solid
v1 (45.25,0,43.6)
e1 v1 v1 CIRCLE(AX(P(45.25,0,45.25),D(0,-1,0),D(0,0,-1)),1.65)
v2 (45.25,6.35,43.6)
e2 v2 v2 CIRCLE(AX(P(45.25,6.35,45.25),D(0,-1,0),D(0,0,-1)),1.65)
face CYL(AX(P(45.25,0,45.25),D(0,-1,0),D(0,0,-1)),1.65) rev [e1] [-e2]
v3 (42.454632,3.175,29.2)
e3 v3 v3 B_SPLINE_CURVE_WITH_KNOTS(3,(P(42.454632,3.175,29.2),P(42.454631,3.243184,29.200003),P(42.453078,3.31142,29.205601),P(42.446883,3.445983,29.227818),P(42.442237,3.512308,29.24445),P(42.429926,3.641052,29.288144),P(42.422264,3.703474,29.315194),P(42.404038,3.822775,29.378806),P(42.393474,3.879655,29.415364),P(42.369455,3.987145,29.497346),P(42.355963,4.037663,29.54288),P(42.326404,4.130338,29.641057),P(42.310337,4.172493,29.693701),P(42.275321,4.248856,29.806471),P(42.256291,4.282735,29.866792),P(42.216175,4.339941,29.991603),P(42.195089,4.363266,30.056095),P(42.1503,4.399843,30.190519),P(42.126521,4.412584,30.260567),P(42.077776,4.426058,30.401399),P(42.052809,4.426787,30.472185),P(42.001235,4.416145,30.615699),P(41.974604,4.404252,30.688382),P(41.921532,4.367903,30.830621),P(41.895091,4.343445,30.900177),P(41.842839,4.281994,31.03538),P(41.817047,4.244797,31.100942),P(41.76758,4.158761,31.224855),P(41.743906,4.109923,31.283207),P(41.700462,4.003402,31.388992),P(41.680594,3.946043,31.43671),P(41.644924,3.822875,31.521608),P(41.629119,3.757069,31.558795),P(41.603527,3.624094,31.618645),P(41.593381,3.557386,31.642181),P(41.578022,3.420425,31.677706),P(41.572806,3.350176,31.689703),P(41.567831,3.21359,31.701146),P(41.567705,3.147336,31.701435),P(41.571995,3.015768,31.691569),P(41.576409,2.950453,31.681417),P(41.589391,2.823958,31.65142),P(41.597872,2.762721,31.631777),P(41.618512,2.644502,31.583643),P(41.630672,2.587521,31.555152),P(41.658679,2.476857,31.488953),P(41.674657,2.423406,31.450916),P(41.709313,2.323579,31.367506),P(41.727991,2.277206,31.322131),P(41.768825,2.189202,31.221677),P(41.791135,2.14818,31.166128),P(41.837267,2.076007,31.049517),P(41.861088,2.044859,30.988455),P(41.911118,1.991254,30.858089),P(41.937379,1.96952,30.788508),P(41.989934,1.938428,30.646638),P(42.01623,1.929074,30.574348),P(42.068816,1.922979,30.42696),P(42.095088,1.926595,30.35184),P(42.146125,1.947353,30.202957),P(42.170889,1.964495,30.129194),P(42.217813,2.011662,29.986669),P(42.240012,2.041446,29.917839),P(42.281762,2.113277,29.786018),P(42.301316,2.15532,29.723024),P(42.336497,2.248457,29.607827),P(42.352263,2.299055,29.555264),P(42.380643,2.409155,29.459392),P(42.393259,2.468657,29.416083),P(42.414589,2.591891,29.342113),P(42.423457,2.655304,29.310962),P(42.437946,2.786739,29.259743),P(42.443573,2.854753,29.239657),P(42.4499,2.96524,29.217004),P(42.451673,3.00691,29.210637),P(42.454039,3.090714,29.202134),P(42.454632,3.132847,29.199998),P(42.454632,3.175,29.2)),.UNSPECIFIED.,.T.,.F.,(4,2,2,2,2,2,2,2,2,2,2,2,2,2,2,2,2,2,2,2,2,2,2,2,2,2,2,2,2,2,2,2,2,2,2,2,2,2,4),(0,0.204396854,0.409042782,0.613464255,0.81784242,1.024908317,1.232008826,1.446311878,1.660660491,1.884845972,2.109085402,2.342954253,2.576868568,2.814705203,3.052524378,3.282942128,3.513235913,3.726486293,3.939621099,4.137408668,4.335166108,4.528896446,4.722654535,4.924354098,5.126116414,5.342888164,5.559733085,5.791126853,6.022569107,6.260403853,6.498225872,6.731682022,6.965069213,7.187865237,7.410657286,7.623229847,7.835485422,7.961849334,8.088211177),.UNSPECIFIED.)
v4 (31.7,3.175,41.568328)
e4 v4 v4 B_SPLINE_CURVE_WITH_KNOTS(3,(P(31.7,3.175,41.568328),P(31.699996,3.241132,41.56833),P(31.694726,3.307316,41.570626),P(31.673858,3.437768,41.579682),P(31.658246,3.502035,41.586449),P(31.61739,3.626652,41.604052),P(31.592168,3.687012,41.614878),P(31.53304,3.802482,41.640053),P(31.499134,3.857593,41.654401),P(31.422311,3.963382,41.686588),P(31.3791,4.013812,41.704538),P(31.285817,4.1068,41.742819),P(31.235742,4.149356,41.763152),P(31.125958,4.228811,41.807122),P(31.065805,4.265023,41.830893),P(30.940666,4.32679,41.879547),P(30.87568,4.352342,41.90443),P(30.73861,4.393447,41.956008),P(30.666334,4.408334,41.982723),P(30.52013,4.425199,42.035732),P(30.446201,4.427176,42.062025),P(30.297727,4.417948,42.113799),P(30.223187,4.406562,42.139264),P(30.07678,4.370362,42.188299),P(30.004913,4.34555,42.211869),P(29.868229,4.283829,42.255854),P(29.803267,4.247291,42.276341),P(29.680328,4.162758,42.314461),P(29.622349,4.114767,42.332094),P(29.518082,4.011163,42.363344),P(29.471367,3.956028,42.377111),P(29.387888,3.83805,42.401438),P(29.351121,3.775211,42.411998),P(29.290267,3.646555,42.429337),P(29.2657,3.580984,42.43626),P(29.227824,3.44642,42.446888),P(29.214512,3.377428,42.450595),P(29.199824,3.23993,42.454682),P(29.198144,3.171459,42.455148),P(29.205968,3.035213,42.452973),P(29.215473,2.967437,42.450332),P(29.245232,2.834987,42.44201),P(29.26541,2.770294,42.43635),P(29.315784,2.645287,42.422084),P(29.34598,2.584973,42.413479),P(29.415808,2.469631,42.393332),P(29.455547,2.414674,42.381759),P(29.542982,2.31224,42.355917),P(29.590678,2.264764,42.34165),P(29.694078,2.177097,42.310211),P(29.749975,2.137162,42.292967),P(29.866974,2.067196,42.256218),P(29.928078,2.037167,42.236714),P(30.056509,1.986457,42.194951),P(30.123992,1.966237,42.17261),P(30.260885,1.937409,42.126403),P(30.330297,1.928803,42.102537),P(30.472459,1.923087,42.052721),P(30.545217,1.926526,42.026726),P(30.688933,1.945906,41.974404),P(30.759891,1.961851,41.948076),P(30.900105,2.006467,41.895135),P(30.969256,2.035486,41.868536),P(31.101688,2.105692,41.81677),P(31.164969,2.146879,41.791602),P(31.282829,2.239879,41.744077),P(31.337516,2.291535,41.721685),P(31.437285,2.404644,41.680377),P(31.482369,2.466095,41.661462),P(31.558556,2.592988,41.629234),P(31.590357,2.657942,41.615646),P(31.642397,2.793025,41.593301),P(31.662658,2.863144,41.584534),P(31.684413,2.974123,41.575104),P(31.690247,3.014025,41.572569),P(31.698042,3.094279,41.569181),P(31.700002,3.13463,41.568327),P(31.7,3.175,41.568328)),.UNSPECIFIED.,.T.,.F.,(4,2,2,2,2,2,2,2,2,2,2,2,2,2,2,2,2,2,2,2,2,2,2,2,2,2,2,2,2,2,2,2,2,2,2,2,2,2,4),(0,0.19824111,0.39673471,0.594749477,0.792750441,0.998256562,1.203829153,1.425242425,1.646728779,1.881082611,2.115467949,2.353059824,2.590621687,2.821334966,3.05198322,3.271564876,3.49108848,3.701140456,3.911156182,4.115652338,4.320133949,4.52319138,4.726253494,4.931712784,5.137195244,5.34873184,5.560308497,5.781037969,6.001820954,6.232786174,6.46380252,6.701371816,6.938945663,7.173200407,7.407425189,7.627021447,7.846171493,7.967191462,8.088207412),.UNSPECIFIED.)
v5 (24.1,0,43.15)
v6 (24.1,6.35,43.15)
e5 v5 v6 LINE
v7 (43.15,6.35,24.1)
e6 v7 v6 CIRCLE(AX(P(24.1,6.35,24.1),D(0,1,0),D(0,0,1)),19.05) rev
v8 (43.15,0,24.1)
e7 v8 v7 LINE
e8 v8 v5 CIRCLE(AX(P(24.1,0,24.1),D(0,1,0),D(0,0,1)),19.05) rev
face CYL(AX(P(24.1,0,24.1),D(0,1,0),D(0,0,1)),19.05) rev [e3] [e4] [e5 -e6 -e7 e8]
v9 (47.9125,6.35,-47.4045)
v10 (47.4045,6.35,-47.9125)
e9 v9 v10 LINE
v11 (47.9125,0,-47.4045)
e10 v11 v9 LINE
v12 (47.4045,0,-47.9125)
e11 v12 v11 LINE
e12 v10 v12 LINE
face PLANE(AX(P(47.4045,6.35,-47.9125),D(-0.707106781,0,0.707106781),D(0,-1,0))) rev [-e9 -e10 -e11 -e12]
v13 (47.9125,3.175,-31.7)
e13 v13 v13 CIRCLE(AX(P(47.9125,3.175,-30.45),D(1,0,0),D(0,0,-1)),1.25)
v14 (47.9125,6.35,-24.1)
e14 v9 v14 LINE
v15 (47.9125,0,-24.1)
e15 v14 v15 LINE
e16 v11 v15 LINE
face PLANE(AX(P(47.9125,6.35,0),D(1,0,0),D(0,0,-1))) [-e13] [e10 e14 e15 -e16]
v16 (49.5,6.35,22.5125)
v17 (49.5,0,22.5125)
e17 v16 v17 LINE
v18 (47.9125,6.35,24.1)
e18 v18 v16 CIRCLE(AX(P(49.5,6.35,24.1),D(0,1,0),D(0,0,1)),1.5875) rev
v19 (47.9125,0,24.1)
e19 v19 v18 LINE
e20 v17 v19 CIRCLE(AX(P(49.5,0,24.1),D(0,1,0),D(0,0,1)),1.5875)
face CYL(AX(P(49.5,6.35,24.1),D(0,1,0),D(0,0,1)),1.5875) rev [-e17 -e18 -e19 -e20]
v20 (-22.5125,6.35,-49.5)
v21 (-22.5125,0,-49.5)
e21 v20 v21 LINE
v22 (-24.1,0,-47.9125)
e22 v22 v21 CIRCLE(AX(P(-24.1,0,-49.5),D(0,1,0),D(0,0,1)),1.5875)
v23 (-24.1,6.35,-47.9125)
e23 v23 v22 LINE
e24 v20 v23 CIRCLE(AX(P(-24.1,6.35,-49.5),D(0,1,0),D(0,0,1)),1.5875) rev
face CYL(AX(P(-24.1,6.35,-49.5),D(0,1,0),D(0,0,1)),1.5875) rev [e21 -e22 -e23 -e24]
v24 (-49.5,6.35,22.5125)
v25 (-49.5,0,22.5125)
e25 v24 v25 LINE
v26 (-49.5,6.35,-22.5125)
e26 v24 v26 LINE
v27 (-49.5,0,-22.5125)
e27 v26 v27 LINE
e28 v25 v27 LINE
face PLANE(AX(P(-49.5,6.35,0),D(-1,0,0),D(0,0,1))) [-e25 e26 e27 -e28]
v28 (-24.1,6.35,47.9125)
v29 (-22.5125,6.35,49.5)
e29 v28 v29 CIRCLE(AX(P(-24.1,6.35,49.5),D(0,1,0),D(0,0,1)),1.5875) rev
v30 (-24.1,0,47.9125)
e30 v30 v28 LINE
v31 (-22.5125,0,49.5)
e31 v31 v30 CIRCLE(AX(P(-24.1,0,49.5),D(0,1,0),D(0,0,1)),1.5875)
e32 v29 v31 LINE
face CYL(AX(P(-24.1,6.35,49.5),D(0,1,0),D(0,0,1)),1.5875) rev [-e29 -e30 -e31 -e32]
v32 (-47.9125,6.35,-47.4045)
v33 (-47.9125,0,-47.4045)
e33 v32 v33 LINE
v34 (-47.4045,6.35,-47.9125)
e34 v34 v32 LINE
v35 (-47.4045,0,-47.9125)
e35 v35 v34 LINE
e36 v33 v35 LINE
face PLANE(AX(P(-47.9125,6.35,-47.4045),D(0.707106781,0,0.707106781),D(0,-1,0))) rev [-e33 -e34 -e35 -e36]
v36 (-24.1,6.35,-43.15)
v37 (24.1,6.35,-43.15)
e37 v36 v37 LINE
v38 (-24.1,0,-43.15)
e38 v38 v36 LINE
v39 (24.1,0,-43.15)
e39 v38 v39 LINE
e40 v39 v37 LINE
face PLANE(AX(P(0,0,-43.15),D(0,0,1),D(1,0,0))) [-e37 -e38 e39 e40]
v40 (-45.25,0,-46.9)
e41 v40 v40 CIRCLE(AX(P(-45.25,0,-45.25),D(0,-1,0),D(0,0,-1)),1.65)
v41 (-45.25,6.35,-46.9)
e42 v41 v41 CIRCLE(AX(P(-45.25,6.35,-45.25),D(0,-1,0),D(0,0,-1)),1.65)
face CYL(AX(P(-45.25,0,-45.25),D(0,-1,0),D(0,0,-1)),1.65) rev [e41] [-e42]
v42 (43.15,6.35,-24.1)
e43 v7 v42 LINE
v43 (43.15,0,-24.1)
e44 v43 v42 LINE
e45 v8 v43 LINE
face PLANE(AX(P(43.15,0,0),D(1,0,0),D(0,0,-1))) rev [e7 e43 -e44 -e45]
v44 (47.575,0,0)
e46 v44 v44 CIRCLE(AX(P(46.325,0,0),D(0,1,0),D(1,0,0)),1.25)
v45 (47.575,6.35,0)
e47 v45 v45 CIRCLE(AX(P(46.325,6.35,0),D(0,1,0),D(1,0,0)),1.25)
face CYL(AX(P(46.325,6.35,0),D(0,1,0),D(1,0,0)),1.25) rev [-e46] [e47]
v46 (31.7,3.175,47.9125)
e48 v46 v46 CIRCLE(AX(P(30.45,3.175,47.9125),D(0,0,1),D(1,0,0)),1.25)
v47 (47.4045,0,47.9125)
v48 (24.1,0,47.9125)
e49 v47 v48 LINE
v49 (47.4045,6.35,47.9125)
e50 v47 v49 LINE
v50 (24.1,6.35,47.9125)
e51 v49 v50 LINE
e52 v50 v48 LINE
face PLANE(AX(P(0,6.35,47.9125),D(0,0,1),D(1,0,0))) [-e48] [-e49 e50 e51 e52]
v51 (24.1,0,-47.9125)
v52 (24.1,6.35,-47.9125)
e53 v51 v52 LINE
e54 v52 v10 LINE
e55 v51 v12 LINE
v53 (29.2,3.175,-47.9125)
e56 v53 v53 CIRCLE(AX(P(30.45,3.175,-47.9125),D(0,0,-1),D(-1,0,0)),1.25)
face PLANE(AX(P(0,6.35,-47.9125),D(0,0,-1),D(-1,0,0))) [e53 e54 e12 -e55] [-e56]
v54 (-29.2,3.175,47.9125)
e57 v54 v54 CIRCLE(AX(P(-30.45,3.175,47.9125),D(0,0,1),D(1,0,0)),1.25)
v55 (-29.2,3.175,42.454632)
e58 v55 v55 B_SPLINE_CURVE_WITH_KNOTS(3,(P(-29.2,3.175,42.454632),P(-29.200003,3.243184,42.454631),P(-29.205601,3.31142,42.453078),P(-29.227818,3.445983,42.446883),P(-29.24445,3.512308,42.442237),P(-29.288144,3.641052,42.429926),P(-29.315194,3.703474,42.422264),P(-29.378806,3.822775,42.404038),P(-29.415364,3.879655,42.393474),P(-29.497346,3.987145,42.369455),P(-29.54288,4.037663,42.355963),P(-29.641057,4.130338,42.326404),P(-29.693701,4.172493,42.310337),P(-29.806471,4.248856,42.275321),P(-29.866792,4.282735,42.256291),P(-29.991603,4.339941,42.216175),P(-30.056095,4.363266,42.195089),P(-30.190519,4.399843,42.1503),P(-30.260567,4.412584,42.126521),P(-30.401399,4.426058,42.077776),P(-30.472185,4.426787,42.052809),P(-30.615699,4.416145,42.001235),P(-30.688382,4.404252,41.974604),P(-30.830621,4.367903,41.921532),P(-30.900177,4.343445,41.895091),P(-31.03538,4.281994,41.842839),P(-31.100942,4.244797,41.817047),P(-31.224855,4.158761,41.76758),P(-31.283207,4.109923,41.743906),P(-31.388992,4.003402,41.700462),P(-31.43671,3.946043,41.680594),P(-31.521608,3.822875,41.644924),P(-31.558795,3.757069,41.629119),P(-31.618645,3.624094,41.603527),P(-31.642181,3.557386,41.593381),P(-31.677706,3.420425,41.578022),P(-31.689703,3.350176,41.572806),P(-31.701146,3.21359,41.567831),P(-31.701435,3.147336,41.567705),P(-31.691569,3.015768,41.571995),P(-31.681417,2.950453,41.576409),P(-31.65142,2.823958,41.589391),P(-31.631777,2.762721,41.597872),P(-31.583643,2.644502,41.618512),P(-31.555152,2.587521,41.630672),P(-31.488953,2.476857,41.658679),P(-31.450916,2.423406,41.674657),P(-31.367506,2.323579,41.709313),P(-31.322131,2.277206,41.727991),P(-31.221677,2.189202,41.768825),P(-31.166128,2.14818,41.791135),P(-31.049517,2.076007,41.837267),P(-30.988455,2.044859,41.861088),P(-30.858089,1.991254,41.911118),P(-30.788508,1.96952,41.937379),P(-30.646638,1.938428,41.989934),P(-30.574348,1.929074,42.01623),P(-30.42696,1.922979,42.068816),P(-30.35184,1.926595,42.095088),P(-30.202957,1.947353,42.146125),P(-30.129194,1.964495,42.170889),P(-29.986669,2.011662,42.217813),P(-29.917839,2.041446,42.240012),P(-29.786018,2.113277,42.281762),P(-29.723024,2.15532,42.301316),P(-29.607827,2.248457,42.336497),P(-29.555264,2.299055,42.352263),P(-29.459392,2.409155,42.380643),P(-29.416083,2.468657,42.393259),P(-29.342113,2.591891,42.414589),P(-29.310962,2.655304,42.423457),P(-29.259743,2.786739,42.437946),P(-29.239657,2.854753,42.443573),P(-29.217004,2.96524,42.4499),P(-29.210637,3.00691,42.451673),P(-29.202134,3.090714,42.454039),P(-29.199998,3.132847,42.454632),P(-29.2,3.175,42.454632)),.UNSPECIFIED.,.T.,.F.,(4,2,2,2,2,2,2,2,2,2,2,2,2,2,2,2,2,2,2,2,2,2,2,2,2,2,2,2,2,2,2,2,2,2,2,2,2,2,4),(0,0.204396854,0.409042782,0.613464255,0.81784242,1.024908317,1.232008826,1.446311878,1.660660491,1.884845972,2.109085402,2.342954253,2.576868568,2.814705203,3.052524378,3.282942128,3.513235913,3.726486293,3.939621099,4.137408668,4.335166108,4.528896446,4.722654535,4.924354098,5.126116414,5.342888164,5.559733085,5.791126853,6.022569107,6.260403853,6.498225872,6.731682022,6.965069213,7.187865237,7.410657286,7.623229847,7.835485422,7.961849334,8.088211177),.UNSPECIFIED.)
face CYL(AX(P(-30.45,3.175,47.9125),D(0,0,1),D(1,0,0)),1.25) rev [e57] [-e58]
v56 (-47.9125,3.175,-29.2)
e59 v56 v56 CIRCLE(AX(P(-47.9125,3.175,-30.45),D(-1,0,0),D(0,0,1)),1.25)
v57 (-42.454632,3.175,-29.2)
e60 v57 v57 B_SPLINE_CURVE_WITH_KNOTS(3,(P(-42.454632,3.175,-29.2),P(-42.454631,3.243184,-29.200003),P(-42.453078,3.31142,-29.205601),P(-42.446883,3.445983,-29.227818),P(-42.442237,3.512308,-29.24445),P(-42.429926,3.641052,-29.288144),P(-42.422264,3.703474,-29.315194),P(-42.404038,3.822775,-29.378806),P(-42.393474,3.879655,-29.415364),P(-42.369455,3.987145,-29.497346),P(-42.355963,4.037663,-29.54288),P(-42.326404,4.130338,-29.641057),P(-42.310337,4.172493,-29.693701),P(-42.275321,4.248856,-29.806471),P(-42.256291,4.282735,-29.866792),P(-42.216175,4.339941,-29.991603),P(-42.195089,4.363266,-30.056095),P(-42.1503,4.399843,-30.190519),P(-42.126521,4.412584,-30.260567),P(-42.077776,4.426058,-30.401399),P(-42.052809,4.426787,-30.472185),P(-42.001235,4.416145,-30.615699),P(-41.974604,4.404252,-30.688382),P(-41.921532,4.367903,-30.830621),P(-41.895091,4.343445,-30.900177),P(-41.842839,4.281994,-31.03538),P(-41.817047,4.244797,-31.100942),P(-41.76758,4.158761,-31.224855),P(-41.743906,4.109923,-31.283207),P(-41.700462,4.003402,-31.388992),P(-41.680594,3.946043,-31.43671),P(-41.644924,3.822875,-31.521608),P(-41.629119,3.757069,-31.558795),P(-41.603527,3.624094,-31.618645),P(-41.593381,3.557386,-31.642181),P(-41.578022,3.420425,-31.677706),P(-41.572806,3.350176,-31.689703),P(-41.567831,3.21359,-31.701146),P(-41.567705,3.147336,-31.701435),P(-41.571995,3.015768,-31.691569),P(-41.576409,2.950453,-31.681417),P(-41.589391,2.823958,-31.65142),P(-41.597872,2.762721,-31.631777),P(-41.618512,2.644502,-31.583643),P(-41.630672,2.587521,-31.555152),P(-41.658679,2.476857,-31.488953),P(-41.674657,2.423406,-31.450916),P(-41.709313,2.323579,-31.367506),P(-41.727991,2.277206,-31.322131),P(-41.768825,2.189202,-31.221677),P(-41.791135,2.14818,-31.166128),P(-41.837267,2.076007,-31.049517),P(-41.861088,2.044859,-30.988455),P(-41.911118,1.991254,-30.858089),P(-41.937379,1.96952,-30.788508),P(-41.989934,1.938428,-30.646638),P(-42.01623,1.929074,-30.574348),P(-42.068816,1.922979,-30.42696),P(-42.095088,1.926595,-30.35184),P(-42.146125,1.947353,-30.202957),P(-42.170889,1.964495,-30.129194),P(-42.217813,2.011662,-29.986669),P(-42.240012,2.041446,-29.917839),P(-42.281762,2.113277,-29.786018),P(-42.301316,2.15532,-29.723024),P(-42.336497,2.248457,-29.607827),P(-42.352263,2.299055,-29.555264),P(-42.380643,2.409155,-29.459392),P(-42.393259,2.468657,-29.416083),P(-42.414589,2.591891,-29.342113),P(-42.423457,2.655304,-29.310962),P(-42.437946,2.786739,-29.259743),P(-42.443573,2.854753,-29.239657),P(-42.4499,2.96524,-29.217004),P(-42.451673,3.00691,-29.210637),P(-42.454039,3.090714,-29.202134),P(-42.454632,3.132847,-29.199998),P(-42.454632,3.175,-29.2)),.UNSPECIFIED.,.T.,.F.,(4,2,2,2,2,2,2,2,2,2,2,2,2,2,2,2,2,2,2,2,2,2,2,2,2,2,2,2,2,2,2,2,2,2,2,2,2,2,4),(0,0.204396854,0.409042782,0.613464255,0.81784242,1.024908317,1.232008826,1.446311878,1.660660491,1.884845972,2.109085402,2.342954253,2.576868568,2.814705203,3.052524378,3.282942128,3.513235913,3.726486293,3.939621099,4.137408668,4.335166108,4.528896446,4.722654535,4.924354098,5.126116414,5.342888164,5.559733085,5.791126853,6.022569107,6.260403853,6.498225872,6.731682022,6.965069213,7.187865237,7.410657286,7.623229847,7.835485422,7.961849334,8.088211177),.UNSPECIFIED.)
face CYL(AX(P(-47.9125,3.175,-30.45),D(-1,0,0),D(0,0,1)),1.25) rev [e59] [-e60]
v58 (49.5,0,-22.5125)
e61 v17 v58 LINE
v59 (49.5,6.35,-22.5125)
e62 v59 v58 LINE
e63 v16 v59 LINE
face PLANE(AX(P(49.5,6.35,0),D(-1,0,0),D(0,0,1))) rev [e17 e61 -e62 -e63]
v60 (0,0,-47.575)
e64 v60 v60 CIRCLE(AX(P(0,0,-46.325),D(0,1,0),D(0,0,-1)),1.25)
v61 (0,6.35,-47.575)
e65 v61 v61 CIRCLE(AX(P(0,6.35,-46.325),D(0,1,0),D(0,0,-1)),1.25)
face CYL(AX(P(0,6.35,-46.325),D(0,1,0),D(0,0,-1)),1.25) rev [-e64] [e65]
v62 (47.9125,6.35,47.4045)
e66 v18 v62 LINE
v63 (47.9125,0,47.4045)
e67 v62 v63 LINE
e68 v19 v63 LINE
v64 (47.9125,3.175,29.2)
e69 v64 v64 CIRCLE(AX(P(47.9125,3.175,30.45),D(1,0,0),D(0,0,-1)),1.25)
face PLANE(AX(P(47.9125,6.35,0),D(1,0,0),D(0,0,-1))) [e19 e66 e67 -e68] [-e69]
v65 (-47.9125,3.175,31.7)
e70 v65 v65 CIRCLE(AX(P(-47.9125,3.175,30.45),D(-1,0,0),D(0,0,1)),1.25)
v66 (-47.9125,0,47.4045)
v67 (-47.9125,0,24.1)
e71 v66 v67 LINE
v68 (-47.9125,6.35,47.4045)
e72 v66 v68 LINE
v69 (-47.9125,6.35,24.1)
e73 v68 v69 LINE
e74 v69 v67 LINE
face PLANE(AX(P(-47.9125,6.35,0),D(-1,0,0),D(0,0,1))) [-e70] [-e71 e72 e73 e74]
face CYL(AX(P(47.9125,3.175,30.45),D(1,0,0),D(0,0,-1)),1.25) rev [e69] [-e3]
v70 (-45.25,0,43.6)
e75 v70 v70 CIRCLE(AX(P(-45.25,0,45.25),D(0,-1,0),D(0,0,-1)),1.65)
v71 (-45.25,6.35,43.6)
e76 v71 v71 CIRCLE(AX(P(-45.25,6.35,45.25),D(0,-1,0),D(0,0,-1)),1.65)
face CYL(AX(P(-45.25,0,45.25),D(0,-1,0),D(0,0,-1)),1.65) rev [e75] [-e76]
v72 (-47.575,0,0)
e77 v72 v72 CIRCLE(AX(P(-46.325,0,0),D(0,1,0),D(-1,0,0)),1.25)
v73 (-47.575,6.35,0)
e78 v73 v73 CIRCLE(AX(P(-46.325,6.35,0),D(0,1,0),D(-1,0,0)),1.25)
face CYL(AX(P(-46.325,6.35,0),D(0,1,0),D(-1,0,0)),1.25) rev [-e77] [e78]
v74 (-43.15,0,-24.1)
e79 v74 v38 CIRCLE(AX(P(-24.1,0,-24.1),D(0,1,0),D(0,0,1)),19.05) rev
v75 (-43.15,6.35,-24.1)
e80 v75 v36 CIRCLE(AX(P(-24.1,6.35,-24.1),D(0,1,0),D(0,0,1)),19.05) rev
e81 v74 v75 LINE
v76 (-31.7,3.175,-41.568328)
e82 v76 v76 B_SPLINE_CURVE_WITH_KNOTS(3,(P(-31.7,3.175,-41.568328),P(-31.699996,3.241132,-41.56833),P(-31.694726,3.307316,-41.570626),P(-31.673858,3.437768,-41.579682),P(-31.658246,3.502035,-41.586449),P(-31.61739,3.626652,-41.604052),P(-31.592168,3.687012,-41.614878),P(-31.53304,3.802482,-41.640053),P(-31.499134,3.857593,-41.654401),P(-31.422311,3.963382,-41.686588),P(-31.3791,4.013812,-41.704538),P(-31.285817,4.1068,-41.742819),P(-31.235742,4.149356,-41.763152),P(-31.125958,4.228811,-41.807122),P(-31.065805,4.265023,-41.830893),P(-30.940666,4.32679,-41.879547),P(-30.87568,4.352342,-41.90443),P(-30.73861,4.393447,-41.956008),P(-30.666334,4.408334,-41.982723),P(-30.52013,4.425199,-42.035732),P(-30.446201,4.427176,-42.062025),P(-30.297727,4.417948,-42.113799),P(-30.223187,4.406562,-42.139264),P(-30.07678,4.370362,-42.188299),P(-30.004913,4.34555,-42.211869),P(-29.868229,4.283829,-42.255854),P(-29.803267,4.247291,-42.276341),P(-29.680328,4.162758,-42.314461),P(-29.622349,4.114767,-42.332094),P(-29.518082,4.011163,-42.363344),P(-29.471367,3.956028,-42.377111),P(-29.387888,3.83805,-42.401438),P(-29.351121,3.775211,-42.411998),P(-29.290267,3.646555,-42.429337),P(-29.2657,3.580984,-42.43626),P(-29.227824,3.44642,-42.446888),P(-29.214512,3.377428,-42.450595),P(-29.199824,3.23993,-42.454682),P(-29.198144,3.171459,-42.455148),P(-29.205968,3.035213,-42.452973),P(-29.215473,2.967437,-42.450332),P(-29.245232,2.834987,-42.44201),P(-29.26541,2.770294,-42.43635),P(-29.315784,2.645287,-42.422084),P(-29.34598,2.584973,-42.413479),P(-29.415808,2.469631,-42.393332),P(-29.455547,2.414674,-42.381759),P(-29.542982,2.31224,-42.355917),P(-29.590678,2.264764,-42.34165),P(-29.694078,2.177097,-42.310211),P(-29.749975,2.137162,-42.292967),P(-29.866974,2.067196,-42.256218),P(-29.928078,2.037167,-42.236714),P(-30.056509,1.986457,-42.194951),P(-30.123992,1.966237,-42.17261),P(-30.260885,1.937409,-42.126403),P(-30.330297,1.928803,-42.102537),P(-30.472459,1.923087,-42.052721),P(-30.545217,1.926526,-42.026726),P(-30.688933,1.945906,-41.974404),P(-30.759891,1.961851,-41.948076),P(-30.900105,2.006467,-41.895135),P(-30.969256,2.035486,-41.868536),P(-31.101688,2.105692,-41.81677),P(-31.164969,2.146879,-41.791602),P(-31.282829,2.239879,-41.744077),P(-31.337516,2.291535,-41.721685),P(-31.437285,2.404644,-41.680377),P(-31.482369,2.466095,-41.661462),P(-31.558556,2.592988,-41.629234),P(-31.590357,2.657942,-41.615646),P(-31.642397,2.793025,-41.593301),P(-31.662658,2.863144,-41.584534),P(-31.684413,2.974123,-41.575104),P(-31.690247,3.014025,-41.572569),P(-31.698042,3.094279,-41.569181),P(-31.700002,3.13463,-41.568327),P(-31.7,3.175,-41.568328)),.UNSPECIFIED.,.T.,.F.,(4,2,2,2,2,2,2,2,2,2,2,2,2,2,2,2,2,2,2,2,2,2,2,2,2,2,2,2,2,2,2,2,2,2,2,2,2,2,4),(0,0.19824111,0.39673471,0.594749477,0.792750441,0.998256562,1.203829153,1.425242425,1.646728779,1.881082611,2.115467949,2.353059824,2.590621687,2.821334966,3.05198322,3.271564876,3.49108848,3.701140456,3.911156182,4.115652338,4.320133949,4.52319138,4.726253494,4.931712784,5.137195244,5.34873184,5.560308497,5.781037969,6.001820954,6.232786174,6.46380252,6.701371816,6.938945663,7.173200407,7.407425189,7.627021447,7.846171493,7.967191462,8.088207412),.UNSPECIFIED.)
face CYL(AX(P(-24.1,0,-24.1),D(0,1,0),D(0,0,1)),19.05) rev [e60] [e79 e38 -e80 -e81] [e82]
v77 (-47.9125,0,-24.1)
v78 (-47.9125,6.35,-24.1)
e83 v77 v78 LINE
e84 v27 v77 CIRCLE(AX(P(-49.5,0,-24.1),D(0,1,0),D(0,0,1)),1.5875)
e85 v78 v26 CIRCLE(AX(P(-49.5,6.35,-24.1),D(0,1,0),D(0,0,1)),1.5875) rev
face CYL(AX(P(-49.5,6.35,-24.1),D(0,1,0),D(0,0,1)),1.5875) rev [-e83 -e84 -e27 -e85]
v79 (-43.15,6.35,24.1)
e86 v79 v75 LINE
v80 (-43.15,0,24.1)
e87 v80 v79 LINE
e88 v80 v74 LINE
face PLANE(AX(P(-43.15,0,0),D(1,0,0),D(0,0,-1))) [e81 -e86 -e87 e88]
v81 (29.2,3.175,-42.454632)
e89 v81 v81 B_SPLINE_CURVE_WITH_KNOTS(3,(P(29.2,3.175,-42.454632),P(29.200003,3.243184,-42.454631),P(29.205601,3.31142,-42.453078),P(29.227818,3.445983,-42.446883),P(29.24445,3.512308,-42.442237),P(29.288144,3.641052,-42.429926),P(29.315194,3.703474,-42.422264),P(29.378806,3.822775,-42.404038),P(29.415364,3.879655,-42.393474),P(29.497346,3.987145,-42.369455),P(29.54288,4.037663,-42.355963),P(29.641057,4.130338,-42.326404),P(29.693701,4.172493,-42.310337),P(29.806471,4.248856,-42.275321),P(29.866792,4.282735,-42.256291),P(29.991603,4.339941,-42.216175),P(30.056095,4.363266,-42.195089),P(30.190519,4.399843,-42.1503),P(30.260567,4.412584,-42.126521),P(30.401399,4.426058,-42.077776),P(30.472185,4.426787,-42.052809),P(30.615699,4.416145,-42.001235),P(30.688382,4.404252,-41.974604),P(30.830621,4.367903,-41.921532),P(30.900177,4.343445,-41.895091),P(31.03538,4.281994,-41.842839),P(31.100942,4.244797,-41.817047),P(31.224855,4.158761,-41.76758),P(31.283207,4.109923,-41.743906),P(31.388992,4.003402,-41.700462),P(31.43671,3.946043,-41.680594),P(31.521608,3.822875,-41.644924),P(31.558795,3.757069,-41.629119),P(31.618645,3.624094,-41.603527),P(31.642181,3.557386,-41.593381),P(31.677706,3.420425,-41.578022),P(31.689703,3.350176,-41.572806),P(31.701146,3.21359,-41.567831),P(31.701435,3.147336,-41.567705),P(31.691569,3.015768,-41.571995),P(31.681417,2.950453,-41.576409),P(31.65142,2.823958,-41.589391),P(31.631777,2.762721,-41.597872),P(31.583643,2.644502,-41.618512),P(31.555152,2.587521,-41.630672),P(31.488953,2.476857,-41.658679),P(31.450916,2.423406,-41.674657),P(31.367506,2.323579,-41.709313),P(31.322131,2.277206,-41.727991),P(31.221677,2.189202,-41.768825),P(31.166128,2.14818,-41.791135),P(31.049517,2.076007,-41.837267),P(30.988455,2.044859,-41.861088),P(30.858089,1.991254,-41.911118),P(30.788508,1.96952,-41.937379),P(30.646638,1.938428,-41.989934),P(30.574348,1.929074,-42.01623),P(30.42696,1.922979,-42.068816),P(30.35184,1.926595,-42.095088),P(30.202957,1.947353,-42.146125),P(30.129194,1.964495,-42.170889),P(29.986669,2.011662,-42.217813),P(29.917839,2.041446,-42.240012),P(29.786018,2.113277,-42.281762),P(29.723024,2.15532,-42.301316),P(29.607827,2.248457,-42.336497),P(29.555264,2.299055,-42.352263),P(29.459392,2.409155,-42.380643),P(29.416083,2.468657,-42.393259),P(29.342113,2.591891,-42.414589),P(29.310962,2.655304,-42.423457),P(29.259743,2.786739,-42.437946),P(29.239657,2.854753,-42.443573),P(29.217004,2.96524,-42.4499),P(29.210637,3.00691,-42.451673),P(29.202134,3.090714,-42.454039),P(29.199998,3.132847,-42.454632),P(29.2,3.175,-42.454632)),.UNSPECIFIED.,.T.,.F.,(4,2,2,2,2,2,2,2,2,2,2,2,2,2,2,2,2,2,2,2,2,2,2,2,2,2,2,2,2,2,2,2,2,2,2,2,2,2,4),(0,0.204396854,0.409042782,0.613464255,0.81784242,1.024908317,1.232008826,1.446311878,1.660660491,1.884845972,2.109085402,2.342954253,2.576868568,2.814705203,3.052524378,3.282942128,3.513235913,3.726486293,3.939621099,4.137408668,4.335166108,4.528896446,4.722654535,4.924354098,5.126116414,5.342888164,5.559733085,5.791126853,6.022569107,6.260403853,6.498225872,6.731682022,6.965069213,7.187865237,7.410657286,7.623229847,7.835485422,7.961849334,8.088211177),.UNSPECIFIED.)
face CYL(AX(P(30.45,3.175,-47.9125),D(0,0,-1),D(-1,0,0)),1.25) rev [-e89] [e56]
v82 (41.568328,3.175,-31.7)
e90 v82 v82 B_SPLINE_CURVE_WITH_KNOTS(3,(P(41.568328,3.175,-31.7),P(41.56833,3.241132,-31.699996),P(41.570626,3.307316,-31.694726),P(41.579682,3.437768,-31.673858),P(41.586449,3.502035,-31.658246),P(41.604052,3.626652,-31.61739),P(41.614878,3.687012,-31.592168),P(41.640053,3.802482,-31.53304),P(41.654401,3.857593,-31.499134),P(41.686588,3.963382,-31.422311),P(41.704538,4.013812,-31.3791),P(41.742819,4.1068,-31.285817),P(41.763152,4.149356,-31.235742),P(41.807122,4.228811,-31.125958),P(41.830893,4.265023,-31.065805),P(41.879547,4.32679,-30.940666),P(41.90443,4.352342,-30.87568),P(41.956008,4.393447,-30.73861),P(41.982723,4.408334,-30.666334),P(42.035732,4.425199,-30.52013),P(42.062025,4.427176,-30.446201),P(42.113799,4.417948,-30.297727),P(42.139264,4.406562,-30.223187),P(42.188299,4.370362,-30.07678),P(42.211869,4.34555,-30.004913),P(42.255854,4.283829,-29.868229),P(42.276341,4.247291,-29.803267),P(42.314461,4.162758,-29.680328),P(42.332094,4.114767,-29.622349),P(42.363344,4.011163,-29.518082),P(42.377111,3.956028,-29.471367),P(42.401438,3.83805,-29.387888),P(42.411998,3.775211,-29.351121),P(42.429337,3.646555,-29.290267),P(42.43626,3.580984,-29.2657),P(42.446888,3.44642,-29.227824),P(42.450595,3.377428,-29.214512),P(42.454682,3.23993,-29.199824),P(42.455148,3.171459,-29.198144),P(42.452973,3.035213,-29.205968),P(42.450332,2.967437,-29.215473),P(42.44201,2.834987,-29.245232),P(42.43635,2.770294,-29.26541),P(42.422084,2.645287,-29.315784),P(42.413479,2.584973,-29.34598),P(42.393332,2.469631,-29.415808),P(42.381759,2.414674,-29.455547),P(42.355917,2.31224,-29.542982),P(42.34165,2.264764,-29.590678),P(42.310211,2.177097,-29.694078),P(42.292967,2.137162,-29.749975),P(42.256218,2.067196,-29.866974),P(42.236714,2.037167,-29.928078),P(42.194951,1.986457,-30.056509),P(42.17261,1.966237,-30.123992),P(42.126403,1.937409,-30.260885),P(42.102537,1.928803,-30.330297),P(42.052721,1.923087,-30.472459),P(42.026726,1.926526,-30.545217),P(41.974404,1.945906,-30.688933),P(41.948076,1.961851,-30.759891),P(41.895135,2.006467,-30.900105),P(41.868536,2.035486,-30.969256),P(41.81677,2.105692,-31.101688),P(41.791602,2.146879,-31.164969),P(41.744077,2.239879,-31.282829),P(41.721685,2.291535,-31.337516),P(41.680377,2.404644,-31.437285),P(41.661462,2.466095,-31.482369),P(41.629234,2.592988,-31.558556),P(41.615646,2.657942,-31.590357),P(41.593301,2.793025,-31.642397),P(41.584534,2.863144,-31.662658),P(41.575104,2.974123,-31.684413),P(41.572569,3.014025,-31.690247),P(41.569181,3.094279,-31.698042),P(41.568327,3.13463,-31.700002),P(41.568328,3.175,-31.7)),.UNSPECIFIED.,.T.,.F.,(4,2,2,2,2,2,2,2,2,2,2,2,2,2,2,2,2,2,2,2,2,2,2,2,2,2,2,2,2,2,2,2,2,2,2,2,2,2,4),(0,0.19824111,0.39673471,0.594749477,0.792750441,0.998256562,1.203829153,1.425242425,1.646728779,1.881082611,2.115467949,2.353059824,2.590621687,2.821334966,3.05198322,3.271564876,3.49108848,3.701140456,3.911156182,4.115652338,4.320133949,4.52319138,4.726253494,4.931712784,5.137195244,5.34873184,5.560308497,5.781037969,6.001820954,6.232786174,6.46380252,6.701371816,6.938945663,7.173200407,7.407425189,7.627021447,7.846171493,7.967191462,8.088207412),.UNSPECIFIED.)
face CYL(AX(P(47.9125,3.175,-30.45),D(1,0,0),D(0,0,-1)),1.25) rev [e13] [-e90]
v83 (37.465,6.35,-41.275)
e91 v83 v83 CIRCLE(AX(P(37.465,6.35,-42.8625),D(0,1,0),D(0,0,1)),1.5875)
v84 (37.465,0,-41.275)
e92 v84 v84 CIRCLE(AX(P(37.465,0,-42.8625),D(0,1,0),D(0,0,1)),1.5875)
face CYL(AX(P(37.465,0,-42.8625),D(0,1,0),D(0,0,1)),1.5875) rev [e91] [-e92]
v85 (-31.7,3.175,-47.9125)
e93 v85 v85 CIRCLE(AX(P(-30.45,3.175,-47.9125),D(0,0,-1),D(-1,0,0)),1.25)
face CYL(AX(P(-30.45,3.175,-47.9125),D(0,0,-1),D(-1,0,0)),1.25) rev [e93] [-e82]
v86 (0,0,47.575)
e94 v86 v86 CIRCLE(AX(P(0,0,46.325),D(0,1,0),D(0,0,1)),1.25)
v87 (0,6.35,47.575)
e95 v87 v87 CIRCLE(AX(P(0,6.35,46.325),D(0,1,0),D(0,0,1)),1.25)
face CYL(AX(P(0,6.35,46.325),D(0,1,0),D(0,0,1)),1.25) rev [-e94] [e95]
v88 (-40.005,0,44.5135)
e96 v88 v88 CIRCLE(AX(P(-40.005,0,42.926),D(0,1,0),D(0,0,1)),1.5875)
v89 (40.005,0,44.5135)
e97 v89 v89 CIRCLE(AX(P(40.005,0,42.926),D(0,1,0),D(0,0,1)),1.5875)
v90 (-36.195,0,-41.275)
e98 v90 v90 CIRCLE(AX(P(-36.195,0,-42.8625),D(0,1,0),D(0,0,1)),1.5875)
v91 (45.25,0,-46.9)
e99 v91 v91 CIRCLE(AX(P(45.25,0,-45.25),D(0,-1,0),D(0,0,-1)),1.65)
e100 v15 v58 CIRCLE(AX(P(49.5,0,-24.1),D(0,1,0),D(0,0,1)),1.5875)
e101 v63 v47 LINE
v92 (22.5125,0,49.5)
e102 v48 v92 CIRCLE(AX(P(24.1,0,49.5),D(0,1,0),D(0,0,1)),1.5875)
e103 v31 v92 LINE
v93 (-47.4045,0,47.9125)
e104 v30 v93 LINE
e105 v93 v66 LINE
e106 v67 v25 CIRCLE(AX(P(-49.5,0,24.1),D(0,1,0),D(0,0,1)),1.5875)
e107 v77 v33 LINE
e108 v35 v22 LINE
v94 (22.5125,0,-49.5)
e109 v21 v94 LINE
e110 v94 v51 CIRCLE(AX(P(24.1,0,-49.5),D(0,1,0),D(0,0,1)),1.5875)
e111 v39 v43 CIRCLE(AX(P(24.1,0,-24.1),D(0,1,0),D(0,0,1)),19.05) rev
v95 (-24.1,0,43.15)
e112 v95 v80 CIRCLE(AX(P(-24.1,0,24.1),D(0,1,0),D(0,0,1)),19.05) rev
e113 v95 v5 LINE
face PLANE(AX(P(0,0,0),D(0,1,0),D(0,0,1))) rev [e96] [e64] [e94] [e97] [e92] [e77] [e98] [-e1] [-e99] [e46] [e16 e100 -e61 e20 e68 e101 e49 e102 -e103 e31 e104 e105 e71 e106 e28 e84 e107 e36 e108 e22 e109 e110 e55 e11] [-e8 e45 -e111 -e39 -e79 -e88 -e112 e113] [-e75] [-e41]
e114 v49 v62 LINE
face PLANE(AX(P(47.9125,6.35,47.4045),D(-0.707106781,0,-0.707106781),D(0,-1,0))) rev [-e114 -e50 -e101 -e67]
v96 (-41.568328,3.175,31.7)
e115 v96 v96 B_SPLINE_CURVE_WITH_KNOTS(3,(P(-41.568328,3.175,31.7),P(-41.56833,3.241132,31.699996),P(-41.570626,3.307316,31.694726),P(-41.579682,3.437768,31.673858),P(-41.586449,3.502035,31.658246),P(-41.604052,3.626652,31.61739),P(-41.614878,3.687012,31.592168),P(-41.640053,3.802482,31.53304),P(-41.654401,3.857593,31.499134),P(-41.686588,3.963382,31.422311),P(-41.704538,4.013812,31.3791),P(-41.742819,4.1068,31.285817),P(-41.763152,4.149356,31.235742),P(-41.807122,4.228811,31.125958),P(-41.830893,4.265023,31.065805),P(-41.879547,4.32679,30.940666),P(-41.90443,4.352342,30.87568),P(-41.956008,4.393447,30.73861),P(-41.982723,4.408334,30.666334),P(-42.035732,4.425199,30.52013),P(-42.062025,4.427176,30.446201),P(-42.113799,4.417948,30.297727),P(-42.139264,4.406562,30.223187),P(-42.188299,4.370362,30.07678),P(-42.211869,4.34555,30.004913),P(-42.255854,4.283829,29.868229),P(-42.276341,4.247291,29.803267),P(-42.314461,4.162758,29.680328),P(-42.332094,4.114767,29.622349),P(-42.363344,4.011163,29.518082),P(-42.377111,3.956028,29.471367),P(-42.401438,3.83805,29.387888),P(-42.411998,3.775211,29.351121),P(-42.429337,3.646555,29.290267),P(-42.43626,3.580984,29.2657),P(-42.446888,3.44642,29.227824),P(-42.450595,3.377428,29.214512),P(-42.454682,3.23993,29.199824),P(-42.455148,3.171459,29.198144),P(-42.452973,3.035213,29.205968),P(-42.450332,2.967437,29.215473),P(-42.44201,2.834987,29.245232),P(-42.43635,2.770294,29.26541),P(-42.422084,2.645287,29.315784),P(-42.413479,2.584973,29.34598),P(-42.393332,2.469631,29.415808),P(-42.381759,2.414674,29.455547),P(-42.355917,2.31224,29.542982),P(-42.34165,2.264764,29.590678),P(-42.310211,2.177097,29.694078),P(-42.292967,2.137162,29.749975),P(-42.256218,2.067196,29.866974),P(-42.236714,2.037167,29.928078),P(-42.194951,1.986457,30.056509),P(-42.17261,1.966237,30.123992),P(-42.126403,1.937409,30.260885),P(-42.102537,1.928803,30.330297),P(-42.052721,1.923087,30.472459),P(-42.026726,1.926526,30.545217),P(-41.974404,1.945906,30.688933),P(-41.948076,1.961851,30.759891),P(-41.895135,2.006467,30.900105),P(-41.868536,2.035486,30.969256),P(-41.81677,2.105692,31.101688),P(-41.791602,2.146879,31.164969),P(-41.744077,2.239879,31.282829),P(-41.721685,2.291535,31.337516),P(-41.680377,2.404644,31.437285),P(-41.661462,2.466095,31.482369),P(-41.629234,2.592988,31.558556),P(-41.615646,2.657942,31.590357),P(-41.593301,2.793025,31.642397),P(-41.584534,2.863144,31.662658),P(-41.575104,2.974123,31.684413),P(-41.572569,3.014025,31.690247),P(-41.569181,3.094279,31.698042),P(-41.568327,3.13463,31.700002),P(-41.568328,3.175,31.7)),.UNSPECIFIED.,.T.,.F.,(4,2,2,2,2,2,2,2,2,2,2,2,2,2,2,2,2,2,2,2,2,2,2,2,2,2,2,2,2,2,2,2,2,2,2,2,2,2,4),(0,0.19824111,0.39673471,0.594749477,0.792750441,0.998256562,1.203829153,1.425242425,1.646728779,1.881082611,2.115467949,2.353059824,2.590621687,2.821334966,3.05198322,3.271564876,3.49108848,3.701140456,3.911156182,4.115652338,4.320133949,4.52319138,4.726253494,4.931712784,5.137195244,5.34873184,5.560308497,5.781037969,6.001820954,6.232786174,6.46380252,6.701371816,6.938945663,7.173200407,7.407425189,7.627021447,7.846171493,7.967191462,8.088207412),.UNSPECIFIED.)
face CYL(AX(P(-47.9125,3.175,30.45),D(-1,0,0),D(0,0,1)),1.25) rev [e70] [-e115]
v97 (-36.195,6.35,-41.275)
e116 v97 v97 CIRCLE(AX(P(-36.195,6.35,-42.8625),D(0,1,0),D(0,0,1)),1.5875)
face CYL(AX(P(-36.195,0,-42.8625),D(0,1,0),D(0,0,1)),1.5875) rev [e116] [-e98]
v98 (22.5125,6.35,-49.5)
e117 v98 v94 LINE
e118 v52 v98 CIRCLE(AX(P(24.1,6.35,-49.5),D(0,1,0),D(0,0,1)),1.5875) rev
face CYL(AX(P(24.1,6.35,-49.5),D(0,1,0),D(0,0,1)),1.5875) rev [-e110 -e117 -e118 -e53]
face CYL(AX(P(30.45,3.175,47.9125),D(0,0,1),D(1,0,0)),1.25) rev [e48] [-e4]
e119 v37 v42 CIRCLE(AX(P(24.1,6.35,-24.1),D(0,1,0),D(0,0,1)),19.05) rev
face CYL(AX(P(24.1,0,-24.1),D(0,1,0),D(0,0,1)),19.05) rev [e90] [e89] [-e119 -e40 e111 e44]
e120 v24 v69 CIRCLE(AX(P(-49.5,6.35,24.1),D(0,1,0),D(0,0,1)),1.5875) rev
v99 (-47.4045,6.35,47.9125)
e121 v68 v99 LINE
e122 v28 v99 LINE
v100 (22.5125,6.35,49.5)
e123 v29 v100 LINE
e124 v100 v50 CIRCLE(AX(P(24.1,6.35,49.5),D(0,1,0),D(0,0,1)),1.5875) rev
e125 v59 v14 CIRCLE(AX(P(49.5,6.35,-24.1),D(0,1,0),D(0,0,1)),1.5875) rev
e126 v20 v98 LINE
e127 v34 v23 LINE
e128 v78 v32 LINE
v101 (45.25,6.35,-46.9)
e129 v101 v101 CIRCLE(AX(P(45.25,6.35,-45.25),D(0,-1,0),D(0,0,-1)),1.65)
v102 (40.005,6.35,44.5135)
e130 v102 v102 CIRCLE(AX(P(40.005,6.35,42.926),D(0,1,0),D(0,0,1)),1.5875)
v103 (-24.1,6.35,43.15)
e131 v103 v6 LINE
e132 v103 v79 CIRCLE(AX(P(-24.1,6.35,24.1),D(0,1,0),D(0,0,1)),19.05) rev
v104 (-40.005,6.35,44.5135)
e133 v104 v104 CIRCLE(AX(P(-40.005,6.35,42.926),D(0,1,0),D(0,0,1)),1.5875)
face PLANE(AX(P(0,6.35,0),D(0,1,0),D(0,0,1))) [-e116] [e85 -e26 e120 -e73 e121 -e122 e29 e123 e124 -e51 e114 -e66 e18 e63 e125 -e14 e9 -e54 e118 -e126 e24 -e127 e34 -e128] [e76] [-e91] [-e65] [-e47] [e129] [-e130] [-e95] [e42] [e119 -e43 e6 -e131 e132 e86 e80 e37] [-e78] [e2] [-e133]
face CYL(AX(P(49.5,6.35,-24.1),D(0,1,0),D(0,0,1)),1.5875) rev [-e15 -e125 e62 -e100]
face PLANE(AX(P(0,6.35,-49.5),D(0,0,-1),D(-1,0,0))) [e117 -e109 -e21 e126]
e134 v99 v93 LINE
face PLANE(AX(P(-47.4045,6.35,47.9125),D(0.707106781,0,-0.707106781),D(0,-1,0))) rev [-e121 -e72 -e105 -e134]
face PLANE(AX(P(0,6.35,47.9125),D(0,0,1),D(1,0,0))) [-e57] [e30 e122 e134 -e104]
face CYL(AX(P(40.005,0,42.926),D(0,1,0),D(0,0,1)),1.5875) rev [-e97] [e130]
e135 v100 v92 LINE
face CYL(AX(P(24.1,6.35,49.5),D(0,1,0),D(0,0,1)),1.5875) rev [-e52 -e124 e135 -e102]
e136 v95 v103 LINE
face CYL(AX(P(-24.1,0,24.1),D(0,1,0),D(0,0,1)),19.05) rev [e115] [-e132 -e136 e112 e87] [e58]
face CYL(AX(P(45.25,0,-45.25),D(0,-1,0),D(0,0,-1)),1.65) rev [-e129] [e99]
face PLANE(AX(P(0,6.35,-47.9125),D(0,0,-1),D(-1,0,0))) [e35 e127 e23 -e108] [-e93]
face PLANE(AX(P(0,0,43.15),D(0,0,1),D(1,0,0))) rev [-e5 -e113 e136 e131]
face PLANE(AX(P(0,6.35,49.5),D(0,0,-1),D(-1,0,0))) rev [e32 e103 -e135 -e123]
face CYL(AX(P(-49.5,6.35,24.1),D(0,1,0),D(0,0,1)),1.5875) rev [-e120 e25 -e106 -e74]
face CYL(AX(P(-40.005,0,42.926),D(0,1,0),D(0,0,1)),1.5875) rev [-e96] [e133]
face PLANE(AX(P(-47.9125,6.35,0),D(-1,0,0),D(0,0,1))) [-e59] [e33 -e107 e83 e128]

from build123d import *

# Parameters (mm, degrees)
BOSS_EXTRUDE1_DEPTH            = 6.35
CHAMFER1_SIZE                  = 0.508
FILLET1_R                      = 1.5875
M4X0_7_TAPPED_HOLE2_D          = 3.3
M3X0_5_TAPPED_HOLE1_AT_2_COUNT = 2
M3X0_5_TAPPED_HOLE1_AT_2_PITCH = 60.9
CIRPATTERN1_COUNT              = 4
SKETCH9_R                      = 1.5875
CUT_EXTRUDE2_DEPTH             = 71.290984486
CUT_EXTRUDE3_DEPTH             = 71.290984486
CIRPATTERN2_COUNT              = 4


with BuildPart() as part:
    # Sketch1 → Boss-Extrude1 (new body)
    with BuildSketch(Plane(origin=(0, 0, 0), x_dir=(1, 0, 0), z_dir=(0, 1, 0))):
        Polygon((-47.9125, 22.5125), (-49.5, 22.5125), (-49.5, -22.5125), (-47.9125, -22.5125), (-47.9125, -47.9125), (-22.5125, -47.9125), (-22.5125, -49.5), (22.5125, -49.5), (22.5125, -47.9125), (47.9125, -47.9125), (47.9125, -22.5125), (49.5, -22.5125), (49.5, 22.5125), (47.9125, 22.5125), (47.9125, 47.9125), (22.5125, 47.9125), (22.5125, 49.5), (-22.5125, 49.5), (-22.5125, 47.9125), (-47.9125, 47.9125), align=None)
    extrude(amount=BOSS_EXTRUDE1_DEPTH)

    # Chamfer1
    chamfer1_edges = [part.edges().sort_by_distance(p)[0] for p in [
        (-47.9125, 3.175, -47.9125),
        (47.9125, 3.175, -47.9125),
        (47.9125, 3.175, 47.9125),
        (-47.9125, 3.175, 47.9125),
    ]]
    chamfer(chamfer1_edges, length=CHAMFER1_SIZE)

    # Fillet1
    fillet1_edges = [part.edges().sort_by_distance(p)[0] for p in [
        (-47.9125, 3.175, -22.5125),
        (-22.5125, 3.175, -47.9125),
        (22.5125, 3.175, -47.9125),
        (47.9125, 3.175, -22.5125),
        (47.9125, 3.175, 22.5125),
        (22.5125, 3.175, 47.9125),
        (-22.5125, 3.175, 47.9125),
        (-47.9125, 3.175, 22.5125),
    ]]
    fillet(fillet1_edges, radius=FILLET1_R - 0.0001)  # a hair under: the kernel refuses the full size

    # M4x0.7 Tapped Hole2 (through all)
    with Locations(Plane(origin=(0, 0, 0), x_dir=(-1, 0, 0), z_dir=(0, -1, 0))):
        with Locations((-45.25, 45.25), (45.25, 45.25), (45.25, -45.25), (-45.25, -45.25)):
            Hole(M4X0_7_TAPPED_HOLE2_D / 2)

    # Sketch7 → M3x0.5 Tapped Hole1 (revolve, cut)
    with BuildSketch(Plane(origin=(-30.45, 3.175, 47.9125), x_dir=(0, -1, 0), z_dir=(1, 0, 0))):
        Polygon((0, 0), (0, 8.371075774), (1.25, 7.62), (1.25, 0), align=None)
    m3x0_5_tapped_hole1 = revolve(axis=Axis((-30.45, 3.175, 54.2625), (0, 0, -1)), mode=Mode.SUBTRACT)

    # M3x0.5 Tapped Hole1 at 2: M3x0.5 Tapped Hole1 ×2
    with Locations(*[(i * M3X0_5_TAPPED_HOLE1_AT_2_PITCH, 0, 0) for i in range(1, M3X0_5_TAPPED_HOLE1_AT_2_COUNT)]):
        add(m3x0_5_tapped_hole1, mode=Mode.SUBTRACT)

    # CirPattern1: M3x0.5 Tapped Hole1 ×4 about axis
    cirpattern1_axis = Axis((0, -0.3175, 0), (0, 1, 0))
    for i in range(1, CIRPATTERN1_COUNT):
        add(m3x0_5_tapped_hole1.rotate(cirpattern1_axis, i * 360 / CIRPATTERN1_COUNT), mode=Mode.SUBTRACT)

    # CirPattern1 copy 1 sketch → CirPattern1 copy 1 (revolve, cut)
    with BuildSketch(Plane(origin=(47.9125, 3.175, -30.45), x_dir=(0, -1, 0), z_dir=(0, 0, -1))):
        Polygon((0, 0), (0, 8.371075774), (1.25, 7.62), (1.25, 0), align=None)
    revolve(axis=Axis((54.2625, 3.175, -30.45), (-1, 0, 0)), mode=Mode.SUBTRACT)

    # CirPattern1 copy 2 sketch → CirPattern1 copy 2 (revolve, cut)
    with BuildSketch(Plane(origin=(-30.45, 3.175, -47.9125), x_dir=(0, -1, 0), z_dir=(-1, 0, 0))):
        Polygon((0, 0), (0, 8.371075774), (1.25, 7.62), (1.25, 0), align=None)
    revolve(axis=Axis((-30.45, 3.175, -54.2625), (0, 0, 1)), mode=Mode.SUBTRACT)

    # CirPattern1 copy 3 sketch → CirPattern1 copy 3 (revolve, cut)
    with BuildSketch(Plane(origin=(-47.9125, 3.175, 30.45), x_dir=(0, -1, 0), z_dir=(0, 0, 1))):
        Polygon((0, 0), (0, 8.371075774), (1.25, 7.62), (1.25, 0), align=None)
    revolve(axis=Axis((-54.2625, 3.175, 30.45), (1, 0, 0)), mode=Mode.SUBTRACT)

    # Sketch9 → Cut-Extrude2 (cut, through all)
    with BuildSketch(Plane(origin=(0, 6.35, 0), x_dir=(1, 0, 0), z_dir=(0, 1, 0))):
        with Locations(Location((-40.005, -42.926, 0), (0, 0, 270))):
            Circle(SKETCH9_R)
        with Locations(Location((40.005, -42.926, 0), (0, 0, 270))):
            Circle(SKETCH9_R)
        with Locations(Location((37.465, 42.8625, 0), (0, 0, 270))):
            Circle(SKETCH9_R)
        with Locations(Location((-36.195, 42.8625, 0), (0, 0, 270))):
            Circle(SKETCH9_R)
    extrude(amount=-CUT_EXTRUDE2_DEPTH, mode=Mode.SUBTRACT)

    # Sketch15 → M3x0.5 Tapped Hole3 (revolve, cut)
    with BuildSketch(Plane(origin=(0, 6.35, 46.325), x_dir=(0, 0, 1), z_dir=(1, 0, 0))):
        Polygon((0, 0), (0, 8.371075774), (1.25, 7.62), (1.25, 0), align=None)
    m3x0_5_tapped_hole3 = revolve(axis=Axis((0, 12.7, 46.325), (0, -1, 0)), mode=Mode.SUBTRACT)

    # Sketch16 → Cut-Extrude3 (cut, through all)
    with BuildSketch(Plane(origin=(0, 6.35, 0), x_dir=(1, 0, 0), z_dir=(0, 1, 0))):
        with BuildLine():
            ThreePointArc((-43.15, -24.1), (-37.570384182, -37.570384182), (-24.1, -43.15))
            Line((-24.1, -43.15), (24.1, -43.15))
            ThreePointArc((24.1, -43.15), (37.570384182, -37.570384182), (43.15, -24.1))
            Line((43.15, -24.1), (43.15, 24.1))
            ThreePointArc((43.15, 24.1), (37.570384182, 37.570384182), (24.1, 43.15))
            Line((24.1, 43.15), (-24.1, 43.15))
            ThreePointArc((-24.1, 43.15), (-37.570384182, 37.570384182), (-43.15, 24.1))
            Line((-43.15, 24.1), (-43.15, -24.1))
        make_face()
    extrude(amount=-CUT_EXTRUDE3_DEPTH, mode=Mode.SUBTRACT)

    # CirPattern2: M3x0.5 Tapped Hole3 ×4 about axis
    cirpattern2_axis = Axis((0, 0, 0), (0, 1, 0))
    for i in range(1, CIRPATTERN2_COUNT):
        add(m3x0_5_tapped_hole3.rotate(cirpattern2_axis, i * 360 / CIRPATTERN2_COUNT), mode=Mode.SUBTRACT)


solid = part.part
